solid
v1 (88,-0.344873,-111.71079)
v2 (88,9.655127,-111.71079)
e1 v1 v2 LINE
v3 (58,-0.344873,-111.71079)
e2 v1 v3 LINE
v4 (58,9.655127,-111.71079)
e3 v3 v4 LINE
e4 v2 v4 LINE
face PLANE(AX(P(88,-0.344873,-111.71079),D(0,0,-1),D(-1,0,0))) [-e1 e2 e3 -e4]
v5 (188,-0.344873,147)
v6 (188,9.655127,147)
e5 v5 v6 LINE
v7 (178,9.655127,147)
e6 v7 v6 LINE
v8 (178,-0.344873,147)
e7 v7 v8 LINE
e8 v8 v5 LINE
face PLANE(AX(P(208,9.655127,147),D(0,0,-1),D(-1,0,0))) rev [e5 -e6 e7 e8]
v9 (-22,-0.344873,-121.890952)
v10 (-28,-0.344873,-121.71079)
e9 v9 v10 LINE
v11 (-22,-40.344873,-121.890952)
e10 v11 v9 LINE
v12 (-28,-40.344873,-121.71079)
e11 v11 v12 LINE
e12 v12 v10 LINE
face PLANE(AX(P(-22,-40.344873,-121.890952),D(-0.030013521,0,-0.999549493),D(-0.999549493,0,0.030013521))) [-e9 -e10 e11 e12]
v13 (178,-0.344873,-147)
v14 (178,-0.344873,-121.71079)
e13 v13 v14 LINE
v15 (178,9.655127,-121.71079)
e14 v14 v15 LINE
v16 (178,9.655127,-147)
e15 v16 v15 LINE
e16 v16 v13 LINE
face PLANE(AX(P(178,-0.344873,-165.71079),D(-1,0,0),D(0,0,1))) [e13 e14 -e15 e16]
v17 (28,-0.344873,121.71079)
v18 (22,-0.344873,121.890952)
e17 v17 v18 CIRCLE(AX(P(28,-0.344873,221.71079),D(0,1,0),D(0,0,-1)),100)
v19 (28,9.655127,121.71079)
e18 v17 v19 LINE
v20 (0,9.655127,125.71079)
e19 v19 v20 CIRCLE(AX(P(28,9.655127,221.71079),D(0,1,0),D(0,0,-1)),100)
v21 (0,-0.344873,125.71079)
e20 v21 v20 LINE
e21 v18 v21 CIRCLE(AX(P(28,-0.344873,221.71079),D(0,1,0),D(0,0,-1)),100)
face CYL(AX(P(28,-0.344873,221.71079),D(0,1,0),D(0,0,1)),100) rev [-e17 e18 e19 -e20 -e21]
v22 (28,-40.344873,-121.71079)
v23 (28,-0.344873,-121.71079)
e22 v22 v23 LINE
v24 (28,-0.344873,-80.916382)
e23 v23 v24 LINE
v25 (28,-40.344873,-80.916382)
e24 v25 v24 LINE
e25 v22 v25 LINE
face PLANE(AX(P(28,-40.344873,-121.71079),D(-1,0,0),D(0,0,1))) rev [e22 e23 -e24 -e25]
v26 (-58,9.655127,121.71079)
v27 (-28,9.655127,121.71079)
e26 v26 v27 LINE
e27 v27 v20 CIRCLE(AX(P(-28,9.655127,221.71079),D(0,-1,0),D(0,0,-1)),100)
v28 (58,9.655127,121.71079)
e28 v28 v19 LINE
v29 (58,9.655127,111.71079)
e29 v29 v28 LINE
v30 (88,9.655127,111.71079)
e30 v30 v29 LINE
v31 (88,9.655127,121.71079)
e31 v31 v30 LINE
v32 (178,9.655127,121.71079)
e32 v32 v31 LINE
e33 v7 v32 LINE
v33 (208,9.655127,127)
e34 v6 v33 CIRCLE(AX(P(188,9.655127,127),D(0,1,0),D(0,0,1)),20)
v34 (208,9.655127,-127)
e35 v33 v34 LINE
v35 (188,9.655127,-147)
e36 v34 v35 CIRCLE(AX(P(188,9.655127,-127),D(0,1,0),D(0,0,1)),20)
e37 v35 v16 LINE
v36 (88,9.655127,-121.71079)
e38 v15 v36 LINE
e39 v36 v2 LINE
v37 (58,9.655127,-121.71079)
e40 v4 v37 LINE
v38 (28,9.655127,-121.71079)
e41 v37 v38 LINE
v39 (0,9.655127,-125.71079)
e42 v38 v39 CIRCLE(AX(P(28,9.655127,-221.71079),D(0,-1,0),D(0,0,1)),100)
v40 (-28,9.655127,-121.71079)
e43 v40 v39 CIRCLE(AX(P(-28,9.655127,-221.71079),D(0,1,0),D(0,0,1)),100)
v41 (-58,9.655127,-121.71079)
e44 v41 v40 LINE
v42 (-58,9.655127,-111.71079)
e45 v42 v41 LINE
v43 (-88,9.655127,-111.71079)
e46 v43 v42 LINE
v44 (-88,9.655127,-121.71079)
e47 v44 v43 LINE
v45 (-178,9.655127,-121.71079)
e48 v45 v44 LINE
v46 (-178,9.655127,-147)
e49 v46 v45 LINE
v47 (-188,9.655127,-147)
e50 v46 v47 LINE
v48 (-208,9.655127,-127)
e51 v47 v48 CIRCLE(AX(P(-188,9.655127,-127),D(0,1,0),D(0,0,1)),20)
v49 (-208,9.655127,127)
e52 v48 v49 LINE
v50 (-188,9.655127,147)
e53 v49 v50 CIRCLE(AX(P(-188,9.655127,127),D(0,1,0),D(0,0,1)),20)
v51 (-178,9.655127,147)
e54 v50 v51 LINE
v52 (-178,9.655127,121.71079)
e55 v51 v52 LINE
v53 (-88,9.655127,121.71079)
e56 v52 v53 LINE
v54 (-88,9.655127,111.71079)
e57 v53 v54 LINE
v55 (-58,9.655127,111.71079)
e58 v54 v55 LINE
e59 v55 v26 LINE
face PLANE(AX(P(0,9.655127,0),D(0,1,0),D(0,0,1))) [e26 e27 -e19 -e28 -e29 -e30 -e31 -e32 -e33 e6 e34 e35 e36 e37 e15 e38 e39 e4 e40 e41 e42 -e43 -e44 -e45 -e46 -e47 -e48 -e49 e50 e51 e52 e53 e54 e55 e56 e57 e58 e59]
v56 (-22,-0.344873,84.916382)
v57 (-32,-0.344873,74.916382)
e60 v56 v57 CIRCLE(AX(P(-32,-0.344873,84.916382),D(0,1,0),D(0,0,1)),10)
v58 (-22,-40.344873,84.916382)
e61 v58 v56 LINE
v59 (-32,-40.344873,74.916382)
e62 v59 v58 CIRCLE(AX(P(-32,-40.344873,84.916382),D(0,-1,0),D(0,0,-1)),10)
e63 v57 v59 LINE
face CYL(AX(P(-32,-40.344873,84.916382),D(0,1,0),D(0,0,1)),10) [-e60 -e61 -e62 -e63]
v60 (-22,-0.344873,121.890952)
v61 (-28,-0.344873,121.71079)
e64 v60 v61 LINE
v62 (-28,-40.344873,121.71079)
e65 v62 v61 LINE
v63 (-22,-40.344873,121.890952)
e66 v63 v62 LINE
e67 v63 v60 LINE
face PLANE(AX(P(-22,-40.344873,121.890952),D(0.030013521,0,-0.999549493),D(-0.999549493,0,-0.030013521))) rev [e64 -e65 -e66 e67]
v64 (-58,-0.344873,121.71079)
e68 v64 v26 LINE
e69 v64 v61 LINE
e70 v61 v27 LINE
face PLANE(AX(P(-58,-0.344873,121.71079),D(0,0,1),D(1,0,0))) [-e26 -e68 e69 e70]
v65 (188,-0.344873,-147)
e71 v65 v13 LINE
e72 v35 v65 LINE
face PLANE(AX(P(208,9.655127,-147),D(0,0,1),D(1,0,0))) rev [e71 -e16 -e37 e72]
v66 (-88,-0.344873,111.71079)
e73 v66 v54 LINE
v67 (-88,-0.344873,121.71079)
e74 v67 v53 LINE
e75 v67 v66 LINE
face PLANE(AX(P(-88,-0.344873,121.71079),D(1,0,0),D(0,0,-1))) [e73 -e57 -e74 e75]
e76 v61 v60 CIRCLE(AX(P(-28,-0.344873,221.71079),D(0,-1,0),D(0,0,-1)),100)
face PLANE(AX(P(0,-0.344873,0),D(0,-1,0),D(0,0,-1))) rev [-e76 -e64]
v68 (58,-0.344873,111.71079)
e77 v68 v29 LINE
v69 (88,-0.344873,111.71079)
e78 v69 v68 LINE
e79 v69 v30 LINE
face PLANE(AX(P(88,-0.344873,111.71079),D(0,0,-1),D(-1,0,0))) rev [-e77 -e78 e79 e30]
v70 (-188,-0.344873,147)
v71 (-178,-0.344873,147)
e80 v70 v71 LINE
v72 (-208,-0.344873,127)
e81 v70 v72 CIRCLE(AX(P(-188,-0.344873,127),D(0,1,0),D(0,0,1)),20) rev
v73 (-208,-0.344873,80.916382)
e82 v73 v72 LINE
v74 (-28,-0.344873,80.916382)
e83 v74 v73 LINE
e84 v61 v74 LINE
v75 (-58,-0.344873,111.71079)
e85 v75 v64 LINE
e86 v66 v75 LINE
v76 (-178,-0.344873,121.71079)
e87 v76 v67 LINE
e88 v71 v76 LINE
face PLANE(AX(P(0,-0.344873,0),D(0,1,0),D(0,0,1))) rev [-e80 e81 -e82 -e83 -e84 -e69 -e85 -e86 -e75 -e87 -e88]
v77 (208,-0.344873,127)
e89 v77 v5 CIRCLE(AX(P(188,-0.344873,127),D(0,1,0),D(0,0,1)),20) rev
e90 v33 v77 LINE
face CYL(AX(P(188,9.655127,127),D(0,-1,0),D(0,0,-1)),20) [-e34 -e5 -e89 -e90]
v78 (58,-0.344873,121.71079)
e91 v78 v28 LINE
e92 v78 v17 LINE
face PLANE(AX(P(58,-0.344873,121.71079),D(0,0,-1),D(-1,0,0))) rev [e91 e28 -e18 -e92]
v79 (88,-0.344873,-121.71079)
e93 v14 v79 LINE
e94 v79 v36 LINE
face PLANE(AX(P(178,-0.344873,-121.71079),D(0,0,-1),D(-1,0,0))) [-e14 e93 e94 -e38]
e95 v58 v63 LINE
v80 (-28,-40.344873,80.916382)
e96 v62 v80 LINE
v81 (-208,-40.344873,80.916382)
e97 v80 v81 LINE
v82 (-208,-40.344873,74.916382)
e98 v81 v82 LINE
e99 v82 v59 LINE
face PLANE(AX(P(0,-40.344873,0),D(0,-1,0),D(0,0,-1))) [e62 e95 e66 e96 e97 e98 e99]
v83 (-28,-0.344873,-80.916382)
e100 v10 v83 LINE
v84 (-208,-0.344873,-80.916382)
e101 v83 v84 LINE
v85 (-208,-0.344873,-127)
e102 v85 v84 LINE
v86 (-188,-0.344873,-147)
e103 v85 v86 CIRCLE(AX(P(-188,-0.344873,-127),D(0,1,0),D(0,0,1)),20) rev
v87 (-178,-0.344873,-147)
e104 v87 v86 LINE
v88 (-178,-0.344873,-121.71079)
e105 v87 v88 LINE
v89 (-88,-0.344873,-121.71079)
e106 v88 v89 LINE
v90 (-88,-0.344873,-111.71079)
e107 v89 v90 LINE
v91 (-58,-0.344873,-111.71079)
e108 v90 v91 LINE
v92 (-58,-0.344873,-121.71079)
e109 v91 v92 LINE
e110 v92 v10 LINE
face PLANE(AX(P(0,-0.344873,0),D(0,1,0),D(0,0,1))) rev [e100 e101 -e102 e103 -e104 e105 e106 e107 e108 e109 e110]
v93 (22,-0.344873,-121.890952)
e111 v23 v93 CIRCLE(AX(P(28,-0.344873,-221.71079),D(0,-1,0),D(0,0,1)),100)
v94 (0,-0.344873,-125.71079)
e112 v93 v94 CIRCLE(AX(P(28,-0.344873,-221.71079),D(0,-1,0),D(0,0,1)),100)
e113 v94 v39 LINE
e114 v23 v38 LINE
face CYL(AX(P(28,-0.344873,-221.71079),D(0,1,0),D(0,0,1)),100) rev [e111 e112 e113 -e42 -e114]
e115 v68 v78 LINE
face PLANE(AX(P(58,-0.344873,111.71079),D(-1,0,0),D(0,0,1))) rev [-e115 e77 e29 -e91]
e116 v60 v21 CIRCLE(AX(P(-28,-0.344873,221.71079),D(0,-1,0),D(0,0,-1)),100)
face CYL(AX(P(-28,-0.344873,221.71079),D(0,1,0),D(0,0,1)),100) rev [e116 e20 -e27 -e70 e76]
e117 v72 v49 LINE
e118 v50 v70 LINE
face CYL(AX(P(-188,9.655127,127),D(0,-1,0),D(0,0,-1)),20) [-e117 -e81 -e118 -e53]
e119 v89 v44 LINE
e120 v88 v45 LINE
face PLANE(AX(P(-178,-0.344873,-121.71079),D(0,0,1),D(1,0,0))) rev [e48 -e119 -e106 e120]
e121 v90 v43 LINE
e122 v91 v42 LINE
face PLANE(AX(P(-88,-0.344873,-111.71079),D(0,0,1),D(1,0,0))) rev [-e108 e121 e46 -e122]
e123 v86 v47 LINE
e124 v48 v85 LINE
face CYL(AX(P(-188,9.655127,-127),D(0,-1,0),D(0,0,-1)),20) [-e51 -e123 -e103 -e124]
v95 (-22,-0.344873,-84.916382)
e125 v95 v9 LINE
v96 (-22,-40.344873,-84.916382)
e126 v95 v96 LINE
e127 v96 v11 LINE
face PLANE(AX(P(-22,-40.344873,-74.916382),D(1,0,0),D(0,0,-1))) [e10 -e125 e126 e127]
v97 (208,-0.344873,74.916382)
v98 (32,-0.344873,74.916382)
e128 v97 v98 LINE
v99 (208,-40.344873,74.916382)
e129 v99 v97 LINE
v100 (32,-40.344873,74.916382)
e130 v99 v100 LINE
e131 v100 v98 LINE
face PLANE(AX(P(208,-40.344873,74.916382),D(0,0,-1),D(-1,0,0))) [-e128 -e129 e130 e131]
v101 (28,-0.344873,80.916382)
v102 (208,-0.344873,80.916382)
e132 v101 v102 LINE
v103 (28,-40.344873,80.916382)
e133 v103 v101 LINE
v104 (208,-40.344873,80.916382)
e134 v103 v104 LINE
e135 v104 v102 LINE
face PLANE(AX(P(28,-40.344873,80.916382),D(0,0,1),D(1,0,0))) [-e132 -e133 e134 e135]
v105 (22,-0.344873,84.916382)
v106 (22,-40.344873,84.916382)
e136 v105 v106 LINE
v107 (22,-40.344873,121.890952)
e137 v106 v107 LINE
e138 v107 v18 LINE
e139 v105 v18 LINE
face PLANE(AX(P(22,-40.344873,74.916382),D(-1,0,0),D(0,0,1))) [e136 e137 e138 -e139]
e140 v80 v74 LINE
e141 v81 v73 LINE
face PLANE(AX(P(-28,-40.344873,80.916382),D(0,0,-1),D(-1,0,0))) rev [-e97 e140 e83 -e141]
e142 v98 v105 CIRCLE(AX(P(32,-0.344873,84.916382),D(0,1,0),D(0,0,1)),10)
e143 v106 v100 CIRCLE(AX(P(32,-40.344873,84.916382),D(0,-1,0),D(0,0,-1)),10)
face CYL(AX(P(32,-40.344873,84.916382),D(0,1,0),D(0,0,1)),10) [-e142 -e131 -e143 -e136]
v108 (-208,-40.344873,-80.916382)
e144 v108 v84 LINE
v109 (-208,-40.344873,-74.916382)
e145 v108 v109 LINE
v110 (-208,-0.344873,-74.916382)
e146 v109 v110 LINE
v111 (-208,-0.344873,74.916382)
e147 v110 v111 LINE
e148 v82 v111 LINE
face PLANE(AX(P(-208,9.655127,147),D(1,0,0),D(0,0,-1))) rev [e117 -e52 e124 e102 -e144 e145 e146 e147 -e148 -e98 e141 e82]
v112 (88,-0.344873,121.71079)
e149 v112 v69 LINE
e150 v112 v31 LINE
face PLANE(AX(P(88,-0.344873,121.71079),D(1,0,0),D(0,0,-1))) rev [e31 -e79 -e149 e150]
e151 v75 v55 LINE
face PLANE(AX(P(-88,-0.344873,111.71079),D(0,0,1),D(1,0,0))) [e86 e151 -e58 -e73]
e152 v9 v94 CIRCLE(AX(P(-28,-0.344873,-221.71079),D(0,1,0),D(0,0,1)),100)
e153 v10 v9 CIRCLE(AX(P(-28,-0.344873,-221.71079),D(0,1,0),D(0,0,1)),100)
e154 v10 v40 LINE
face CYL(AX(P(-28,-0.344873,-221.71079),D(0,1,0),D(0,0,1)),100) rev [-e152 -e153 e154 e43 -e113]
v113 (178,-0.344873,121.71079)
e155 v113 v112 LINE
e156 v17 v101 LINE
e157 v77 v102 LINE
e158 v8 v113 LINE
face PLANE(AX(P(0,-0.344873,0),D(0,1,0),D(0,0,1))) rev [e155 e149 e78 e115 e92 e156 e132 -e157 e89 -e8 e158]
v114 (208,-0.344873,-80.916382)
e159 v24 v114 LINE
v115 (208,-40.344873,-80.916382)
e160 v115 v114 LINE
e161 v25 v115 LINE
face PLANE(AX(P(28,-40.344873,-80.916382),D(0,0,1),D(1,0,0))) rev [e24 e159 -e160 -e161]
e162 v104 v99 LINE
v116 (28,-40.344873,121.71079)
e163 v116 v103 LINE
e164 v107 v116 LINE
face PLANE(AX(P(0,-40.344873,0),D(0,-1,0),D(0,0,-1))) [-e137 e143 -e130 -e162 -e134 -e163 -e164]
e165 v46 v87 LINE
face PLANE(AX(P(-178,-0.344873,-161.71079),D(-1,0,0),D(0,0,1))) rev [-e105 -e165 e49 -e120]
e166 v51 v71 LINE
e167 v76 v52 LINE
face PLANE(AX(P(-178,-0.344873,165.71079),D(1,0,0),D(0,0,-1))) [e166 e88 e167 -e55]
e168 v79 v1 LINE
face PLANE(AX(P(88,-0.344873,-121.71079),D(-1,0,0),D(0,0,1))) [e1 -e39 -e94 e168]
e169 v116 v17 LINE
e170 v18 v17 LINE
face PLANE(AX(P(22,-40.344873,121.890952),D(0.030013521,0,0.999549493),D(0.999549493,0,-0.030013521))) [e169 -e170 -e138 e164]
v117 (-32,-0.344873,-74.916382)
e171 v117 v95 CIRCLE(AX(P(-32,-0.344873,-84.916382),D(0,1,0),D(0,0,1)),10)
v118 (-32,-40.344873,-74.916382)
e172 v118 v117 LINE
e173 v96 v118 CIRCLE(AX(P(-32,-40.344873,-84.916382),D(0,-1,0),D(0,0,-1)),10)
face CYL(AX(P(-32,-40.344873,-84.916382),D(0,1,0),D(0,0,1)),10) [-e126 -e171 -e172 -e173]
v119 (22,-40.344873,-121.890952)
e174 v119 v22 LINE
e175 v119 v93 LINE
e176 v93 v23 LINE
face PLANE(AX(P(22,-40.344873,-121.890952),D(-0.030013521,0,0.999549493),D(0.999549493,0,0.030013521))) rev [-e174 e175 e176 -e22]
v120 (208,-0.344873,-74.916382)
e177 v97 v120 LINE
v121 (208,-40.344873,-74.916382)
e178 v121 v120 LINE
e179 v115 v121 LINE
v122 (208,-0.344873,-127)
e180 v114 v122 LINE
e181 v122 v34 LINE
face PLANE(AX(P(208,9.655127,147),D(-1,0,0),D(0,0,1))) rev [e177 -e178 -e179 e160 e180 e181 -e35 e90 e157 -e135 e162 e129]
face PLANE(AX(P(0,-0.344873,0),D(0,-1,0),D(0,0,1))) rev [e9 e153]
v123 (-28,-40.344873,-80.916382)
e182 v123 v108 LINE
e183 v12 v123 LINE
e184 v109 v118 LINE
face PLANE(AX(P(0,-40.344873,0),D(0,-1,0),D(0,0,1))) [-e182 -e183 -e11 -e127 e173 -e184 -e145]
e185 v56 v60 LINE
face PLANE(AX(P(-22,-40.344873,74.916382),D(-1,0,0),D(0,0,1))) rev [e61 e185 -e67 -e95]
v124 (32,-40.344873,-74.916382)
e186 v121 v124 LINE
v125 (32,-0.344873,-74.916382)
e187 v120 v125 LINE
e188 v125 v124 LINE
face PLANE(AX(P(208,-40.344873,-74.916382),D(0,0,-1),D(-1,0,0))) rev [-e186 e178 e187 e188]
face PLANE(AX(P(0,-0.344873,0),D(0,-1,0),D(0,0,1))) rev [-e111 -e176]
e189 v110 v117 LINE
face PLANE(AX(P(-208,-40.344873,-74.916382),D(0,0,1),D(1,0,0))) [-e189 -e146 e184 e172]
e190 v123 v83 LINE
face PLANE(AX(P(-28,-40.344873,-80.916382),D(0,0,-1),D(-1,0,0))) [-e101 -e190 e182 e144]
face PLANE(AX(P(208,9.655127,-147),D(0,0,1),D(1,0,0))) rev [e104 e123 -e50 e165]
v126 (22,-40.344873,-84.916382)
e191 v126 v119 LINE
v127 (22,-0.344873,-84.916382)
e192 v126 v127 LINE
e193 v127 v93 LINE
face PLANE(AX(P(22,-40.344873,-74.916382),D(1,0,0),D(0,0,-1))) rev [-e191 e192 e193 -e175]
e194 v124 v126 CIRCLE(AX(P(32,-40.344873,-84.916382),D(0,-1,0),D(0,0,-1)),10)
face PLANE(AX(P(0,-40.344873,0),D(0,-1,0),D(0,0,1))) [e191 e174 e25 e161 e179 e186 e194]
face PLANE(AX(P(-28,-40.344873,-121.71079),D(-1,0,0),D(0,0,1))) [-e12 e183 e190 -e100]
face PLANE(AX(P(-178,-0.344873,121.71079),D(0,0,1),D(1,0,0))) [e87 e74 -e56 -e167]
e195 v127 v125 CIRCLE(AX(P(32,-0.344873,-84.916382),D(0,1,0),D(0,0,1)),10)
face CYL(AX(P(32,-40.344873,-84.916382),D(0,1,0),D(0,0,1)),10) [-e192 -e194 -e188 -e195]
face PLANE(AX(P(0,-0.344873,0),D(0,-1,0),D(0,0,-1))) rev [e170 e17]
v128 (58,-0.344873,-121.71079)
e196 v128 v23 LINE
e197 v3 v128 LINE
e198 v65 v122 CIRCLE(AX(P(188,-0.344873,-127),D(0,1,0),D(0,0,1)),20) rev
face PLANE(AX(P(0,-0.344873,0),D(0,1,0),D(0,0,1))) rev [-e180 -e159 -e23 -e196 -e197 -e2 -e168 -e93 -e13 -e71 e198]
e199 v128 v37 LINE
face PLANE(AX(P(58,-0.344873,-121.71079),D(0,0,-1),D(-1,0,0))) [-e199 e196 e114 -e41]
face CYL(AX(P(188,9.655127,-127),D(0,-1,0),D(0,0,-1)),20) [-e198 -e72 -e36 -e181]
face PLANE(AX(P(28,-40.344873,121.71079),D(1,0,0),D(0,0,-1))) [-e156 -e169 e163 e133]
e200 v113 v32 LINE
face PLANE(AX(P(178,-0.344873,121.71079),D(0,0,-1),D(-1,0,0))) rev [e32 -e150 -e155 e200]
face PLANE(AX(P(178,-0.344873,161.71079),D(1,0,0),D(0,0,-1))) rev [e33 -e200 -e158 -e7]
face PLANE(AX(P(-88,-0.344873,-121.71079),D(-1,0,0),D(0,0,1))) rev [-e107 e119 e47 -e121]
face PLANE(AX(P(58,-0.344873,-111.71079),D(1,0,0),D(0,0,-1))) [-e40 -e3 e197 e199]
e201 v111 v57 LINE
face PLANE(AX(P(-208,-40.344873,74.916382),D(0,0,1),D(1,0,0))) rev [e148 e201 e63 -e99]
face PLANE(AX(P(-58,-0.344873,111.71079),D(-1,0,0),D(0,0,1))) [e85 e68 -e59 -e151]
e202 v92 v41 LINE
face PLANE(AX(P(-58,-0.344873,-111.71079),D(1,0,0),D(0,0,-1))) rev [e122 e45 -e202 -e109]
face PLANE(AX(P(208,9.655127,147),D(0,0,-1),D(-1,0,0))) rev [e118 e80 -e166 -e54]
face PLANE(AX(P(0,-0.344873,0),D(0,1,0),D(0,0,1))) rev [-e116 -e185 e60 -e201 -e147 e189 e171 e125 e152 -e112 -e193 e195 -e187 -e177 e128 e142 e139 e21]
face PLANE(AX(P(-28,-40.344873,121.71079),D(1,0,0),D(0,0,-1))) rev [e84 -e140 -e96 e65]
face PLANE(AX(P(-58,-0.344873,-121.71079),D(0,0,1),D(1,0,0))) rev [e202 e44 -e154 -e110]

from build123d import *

# Parameters (mm, degrees)
CROQUIS1_W               = 208
CROQUIS1_H               = 147
SALIENTE_EXTRUIR1_DEPTH  = 5
CORTAR_EXTRUIR1_DEPTH    = 128.449009412
SIMETR_A2_COPY_1_DEPTH   = 128.449009412
REDONDEO1_R              = 10
SALIENTE_EXTRUIR3_DEPTH  = 20
REDONDEO2_R              = 5
REDONDEO2_OF_SIMETR_A3_R = 5
SIMETR_A4_START          = -20
SIMETR_A4_DEPTH          = 20
ESCALA1_SCALE            = 2


# Read off the part's stored shape, not the designer's step: Simetría4
with BuildPart() as part:
    # Croquis1 → Saliente-Extruir1 (new body)
    with BuildSketch(Plane(origin=(0, 0, 0), x_dir=(1, 0, 0), z_dir=(0, 1, 0))):
        Rectangle(CROQUIS1_W, CROQUIS1_H)
    extrude(amount=SALIENTE_EXTRUIR1_DEPTH)

    # Croquis3 → Cortar-Extruir1 (cut, through all)
    with BuildSketch(Plane(origin=(0, 5, 0), x_dir=(1, 0, 0), z_dir=(0, 1, 0))):
        with BuildLine():
            Line((-89, 80.855395091), (-89, 60.855395091))
            Line((-89, 60.855395091), (-44, 60.855395091))
            Line((-44, 60.855395091), (-44, 55.855395091))
            Line((-44, 55.855395091), (-29, 55.855395091))
            Line((-29, 55.855395091), (-29, 60.855395091))
            Line((-29, 60.855395091), (-14, 60.855395091))
            ThreePointArc((-14, 60.855395091), (-6.928932188, 61.357920408), (0, 62.855395091))
            Line((0, 62.855395091), (0, 82.855395091))
            Line((0, 82.855395091), (-89, 82.855395091))
            Line((-89, 82.855395091), (-89, 80.855395091))
        make_face()
    cortar_extruir1 = extrude(amount=-CORTAR_EXTRUIR1_DEPTH, mode=Mode.SUBTRACT)

    # Simetría1: Cortar-Extruir1 across plane
    add(cortar_extruir1.mirror(Plane.XY), mode=Mode.SUBTRACT)

    # Simetría2: Cortar-Extruir1 across plane
    add(cortar_extruir1.mirror(Plane(origin=(0, 0, 0), x_dir=(0, 0, 1), z_dir=(1, 0, 0))), mode=Mode.SUBTRACT)

    # Simetría2 copy 1 sketch → Simetría2 copy 1 (cut, through all)
    with BuildSketch(Plane(origin=(0, 5, 0), x_dir=(-1, 0, 0), z_dir=(0, 1, 0))):
        with BuildLine():
            Line((-89, 80.855395091), (-89, 60.855395091))
            Line((-89, 60.855395091), (-44, 60.855395091))
            Line((-44, 60.855395091), (-44, 55.855395091))
            Line((-44, 55.855395091), (-29, 55.855395091))
            Line((-29, 55.855395091), (-29, 60.855395091))
            Line((-29, 60.855395091), (-14, 60.855395091))
            ThreePointArc((-14, 60.855395091), (-6.928932188, 61.357920408), (0, 62.855395091))
            Line((0, 62.855395091), (0, 82.855395091))
            Line((0, 82.855395091), (-89, 82.855395091))
            Line((-89, 82.855395091), (-89, 80.855395091))
        make_face()
    extrude(amount=-SIMETR_A2_COPY_1_DEPTH, mode=Mode.SUBTRACT)

    # Redondeo1
    redondeo1_edges = [part.edges().sort_by_distance(p)[0] for p in [
        (-104, 2.5, -73.5),
        (104, 2.5, -73.5),
        (104, 2.5, 73.5),
        (-104, 2.5, 73.5),
    ]]
    fillet(redondeo1_edges, radius=REDONDEO1_R)

    # Croquis5 → Saliente-Extruir3 (add)
    with BuildSketch(Plane.XZ):
        Polygon((-104, 37.458190843), (-11, 37.458190843), (-11, 60.945476237), (-14, 60.855395091), (-14, 40.458190843), (-104, 40.458190843), align=None)
    saliente_extruir3 = extrude(amount=SALIENTE_EXTRUIR3_DEPTH)

    # Redondeo2
    redondeo2_edges = [part.edges().sort_by_distance(p)[0] for p in [
        (-11, -10, 37.458190843),
    ]]
    fillet(redondeo2_edges, radius=REDONDEO2_R)

    # Simetría3: Saliente-Extruir3 across plane
    add(saliente_extruir3.mirror(Plane.XY))

    # Redondeo2 of Simetría3
    redondeo2_of_simetr_a3_edges = [part.edges().sort_by_distance(p)[0] for p in [
        (-11, -10, -37.458190843),
    ]]
    fillet(redondeo2_of_simetr_a3_edges, radius=REDONDEO2_OF_SIMETR_A3_R)

    # Simetría4 outline → Simetría4 (add)
    with BuildSketch(Plane(origin=(0, 0, 0), x_dir=(1, 0, 0), z_dir=(0, 1, 0)).offset(SIMETR_A4_START)):
        with BuildLine():
            Line((104, -40.458190843), (104, -37.458190843))
            Line((104, -37.458190843), (16, -37.458190843))
            ThreePointArc((16, -37.458190843), (12.464466094, -38.922656937), (11, -42.458190843))
            Line((11, -42.458190843), (11, -60.945476237))
            Line((11, -60.945476237), (14, -60.855395091))
            Line((14, -60.855395091), (14, -40.458190843))
            Line((14, -40.458190843), (104, -40.458190843))
        make_face()
        with BuildLine():
            Line((104, 37.458190843), (104, 40.458190843))
            Line((104, 40.458190843), (14, 40.458190843))
            Line((14, 40.458190843), (14, 60.855395091))
            Line((14, 60.855395091), (11, 60.945476237))
            Line((11, 60.945476237), (11, 42.458190843))
            ThreePointArc((11, 42.458190843), (12.464466094, 38.922656937), (16, 37.458190843))
            Line((16, 37.458190843), (104, 37.458190843))
        make_face()
    extrude(amount=SIMETR_A4_DEPTH)


with BuildPart() as part_1:
    # Escala1: scaled about (0, 0.344872769, 0)
    add(part.part.scale(ESCALA1_SCALE).moved(Location((0, -0.344872769, 0))))


solid = part_1.part
